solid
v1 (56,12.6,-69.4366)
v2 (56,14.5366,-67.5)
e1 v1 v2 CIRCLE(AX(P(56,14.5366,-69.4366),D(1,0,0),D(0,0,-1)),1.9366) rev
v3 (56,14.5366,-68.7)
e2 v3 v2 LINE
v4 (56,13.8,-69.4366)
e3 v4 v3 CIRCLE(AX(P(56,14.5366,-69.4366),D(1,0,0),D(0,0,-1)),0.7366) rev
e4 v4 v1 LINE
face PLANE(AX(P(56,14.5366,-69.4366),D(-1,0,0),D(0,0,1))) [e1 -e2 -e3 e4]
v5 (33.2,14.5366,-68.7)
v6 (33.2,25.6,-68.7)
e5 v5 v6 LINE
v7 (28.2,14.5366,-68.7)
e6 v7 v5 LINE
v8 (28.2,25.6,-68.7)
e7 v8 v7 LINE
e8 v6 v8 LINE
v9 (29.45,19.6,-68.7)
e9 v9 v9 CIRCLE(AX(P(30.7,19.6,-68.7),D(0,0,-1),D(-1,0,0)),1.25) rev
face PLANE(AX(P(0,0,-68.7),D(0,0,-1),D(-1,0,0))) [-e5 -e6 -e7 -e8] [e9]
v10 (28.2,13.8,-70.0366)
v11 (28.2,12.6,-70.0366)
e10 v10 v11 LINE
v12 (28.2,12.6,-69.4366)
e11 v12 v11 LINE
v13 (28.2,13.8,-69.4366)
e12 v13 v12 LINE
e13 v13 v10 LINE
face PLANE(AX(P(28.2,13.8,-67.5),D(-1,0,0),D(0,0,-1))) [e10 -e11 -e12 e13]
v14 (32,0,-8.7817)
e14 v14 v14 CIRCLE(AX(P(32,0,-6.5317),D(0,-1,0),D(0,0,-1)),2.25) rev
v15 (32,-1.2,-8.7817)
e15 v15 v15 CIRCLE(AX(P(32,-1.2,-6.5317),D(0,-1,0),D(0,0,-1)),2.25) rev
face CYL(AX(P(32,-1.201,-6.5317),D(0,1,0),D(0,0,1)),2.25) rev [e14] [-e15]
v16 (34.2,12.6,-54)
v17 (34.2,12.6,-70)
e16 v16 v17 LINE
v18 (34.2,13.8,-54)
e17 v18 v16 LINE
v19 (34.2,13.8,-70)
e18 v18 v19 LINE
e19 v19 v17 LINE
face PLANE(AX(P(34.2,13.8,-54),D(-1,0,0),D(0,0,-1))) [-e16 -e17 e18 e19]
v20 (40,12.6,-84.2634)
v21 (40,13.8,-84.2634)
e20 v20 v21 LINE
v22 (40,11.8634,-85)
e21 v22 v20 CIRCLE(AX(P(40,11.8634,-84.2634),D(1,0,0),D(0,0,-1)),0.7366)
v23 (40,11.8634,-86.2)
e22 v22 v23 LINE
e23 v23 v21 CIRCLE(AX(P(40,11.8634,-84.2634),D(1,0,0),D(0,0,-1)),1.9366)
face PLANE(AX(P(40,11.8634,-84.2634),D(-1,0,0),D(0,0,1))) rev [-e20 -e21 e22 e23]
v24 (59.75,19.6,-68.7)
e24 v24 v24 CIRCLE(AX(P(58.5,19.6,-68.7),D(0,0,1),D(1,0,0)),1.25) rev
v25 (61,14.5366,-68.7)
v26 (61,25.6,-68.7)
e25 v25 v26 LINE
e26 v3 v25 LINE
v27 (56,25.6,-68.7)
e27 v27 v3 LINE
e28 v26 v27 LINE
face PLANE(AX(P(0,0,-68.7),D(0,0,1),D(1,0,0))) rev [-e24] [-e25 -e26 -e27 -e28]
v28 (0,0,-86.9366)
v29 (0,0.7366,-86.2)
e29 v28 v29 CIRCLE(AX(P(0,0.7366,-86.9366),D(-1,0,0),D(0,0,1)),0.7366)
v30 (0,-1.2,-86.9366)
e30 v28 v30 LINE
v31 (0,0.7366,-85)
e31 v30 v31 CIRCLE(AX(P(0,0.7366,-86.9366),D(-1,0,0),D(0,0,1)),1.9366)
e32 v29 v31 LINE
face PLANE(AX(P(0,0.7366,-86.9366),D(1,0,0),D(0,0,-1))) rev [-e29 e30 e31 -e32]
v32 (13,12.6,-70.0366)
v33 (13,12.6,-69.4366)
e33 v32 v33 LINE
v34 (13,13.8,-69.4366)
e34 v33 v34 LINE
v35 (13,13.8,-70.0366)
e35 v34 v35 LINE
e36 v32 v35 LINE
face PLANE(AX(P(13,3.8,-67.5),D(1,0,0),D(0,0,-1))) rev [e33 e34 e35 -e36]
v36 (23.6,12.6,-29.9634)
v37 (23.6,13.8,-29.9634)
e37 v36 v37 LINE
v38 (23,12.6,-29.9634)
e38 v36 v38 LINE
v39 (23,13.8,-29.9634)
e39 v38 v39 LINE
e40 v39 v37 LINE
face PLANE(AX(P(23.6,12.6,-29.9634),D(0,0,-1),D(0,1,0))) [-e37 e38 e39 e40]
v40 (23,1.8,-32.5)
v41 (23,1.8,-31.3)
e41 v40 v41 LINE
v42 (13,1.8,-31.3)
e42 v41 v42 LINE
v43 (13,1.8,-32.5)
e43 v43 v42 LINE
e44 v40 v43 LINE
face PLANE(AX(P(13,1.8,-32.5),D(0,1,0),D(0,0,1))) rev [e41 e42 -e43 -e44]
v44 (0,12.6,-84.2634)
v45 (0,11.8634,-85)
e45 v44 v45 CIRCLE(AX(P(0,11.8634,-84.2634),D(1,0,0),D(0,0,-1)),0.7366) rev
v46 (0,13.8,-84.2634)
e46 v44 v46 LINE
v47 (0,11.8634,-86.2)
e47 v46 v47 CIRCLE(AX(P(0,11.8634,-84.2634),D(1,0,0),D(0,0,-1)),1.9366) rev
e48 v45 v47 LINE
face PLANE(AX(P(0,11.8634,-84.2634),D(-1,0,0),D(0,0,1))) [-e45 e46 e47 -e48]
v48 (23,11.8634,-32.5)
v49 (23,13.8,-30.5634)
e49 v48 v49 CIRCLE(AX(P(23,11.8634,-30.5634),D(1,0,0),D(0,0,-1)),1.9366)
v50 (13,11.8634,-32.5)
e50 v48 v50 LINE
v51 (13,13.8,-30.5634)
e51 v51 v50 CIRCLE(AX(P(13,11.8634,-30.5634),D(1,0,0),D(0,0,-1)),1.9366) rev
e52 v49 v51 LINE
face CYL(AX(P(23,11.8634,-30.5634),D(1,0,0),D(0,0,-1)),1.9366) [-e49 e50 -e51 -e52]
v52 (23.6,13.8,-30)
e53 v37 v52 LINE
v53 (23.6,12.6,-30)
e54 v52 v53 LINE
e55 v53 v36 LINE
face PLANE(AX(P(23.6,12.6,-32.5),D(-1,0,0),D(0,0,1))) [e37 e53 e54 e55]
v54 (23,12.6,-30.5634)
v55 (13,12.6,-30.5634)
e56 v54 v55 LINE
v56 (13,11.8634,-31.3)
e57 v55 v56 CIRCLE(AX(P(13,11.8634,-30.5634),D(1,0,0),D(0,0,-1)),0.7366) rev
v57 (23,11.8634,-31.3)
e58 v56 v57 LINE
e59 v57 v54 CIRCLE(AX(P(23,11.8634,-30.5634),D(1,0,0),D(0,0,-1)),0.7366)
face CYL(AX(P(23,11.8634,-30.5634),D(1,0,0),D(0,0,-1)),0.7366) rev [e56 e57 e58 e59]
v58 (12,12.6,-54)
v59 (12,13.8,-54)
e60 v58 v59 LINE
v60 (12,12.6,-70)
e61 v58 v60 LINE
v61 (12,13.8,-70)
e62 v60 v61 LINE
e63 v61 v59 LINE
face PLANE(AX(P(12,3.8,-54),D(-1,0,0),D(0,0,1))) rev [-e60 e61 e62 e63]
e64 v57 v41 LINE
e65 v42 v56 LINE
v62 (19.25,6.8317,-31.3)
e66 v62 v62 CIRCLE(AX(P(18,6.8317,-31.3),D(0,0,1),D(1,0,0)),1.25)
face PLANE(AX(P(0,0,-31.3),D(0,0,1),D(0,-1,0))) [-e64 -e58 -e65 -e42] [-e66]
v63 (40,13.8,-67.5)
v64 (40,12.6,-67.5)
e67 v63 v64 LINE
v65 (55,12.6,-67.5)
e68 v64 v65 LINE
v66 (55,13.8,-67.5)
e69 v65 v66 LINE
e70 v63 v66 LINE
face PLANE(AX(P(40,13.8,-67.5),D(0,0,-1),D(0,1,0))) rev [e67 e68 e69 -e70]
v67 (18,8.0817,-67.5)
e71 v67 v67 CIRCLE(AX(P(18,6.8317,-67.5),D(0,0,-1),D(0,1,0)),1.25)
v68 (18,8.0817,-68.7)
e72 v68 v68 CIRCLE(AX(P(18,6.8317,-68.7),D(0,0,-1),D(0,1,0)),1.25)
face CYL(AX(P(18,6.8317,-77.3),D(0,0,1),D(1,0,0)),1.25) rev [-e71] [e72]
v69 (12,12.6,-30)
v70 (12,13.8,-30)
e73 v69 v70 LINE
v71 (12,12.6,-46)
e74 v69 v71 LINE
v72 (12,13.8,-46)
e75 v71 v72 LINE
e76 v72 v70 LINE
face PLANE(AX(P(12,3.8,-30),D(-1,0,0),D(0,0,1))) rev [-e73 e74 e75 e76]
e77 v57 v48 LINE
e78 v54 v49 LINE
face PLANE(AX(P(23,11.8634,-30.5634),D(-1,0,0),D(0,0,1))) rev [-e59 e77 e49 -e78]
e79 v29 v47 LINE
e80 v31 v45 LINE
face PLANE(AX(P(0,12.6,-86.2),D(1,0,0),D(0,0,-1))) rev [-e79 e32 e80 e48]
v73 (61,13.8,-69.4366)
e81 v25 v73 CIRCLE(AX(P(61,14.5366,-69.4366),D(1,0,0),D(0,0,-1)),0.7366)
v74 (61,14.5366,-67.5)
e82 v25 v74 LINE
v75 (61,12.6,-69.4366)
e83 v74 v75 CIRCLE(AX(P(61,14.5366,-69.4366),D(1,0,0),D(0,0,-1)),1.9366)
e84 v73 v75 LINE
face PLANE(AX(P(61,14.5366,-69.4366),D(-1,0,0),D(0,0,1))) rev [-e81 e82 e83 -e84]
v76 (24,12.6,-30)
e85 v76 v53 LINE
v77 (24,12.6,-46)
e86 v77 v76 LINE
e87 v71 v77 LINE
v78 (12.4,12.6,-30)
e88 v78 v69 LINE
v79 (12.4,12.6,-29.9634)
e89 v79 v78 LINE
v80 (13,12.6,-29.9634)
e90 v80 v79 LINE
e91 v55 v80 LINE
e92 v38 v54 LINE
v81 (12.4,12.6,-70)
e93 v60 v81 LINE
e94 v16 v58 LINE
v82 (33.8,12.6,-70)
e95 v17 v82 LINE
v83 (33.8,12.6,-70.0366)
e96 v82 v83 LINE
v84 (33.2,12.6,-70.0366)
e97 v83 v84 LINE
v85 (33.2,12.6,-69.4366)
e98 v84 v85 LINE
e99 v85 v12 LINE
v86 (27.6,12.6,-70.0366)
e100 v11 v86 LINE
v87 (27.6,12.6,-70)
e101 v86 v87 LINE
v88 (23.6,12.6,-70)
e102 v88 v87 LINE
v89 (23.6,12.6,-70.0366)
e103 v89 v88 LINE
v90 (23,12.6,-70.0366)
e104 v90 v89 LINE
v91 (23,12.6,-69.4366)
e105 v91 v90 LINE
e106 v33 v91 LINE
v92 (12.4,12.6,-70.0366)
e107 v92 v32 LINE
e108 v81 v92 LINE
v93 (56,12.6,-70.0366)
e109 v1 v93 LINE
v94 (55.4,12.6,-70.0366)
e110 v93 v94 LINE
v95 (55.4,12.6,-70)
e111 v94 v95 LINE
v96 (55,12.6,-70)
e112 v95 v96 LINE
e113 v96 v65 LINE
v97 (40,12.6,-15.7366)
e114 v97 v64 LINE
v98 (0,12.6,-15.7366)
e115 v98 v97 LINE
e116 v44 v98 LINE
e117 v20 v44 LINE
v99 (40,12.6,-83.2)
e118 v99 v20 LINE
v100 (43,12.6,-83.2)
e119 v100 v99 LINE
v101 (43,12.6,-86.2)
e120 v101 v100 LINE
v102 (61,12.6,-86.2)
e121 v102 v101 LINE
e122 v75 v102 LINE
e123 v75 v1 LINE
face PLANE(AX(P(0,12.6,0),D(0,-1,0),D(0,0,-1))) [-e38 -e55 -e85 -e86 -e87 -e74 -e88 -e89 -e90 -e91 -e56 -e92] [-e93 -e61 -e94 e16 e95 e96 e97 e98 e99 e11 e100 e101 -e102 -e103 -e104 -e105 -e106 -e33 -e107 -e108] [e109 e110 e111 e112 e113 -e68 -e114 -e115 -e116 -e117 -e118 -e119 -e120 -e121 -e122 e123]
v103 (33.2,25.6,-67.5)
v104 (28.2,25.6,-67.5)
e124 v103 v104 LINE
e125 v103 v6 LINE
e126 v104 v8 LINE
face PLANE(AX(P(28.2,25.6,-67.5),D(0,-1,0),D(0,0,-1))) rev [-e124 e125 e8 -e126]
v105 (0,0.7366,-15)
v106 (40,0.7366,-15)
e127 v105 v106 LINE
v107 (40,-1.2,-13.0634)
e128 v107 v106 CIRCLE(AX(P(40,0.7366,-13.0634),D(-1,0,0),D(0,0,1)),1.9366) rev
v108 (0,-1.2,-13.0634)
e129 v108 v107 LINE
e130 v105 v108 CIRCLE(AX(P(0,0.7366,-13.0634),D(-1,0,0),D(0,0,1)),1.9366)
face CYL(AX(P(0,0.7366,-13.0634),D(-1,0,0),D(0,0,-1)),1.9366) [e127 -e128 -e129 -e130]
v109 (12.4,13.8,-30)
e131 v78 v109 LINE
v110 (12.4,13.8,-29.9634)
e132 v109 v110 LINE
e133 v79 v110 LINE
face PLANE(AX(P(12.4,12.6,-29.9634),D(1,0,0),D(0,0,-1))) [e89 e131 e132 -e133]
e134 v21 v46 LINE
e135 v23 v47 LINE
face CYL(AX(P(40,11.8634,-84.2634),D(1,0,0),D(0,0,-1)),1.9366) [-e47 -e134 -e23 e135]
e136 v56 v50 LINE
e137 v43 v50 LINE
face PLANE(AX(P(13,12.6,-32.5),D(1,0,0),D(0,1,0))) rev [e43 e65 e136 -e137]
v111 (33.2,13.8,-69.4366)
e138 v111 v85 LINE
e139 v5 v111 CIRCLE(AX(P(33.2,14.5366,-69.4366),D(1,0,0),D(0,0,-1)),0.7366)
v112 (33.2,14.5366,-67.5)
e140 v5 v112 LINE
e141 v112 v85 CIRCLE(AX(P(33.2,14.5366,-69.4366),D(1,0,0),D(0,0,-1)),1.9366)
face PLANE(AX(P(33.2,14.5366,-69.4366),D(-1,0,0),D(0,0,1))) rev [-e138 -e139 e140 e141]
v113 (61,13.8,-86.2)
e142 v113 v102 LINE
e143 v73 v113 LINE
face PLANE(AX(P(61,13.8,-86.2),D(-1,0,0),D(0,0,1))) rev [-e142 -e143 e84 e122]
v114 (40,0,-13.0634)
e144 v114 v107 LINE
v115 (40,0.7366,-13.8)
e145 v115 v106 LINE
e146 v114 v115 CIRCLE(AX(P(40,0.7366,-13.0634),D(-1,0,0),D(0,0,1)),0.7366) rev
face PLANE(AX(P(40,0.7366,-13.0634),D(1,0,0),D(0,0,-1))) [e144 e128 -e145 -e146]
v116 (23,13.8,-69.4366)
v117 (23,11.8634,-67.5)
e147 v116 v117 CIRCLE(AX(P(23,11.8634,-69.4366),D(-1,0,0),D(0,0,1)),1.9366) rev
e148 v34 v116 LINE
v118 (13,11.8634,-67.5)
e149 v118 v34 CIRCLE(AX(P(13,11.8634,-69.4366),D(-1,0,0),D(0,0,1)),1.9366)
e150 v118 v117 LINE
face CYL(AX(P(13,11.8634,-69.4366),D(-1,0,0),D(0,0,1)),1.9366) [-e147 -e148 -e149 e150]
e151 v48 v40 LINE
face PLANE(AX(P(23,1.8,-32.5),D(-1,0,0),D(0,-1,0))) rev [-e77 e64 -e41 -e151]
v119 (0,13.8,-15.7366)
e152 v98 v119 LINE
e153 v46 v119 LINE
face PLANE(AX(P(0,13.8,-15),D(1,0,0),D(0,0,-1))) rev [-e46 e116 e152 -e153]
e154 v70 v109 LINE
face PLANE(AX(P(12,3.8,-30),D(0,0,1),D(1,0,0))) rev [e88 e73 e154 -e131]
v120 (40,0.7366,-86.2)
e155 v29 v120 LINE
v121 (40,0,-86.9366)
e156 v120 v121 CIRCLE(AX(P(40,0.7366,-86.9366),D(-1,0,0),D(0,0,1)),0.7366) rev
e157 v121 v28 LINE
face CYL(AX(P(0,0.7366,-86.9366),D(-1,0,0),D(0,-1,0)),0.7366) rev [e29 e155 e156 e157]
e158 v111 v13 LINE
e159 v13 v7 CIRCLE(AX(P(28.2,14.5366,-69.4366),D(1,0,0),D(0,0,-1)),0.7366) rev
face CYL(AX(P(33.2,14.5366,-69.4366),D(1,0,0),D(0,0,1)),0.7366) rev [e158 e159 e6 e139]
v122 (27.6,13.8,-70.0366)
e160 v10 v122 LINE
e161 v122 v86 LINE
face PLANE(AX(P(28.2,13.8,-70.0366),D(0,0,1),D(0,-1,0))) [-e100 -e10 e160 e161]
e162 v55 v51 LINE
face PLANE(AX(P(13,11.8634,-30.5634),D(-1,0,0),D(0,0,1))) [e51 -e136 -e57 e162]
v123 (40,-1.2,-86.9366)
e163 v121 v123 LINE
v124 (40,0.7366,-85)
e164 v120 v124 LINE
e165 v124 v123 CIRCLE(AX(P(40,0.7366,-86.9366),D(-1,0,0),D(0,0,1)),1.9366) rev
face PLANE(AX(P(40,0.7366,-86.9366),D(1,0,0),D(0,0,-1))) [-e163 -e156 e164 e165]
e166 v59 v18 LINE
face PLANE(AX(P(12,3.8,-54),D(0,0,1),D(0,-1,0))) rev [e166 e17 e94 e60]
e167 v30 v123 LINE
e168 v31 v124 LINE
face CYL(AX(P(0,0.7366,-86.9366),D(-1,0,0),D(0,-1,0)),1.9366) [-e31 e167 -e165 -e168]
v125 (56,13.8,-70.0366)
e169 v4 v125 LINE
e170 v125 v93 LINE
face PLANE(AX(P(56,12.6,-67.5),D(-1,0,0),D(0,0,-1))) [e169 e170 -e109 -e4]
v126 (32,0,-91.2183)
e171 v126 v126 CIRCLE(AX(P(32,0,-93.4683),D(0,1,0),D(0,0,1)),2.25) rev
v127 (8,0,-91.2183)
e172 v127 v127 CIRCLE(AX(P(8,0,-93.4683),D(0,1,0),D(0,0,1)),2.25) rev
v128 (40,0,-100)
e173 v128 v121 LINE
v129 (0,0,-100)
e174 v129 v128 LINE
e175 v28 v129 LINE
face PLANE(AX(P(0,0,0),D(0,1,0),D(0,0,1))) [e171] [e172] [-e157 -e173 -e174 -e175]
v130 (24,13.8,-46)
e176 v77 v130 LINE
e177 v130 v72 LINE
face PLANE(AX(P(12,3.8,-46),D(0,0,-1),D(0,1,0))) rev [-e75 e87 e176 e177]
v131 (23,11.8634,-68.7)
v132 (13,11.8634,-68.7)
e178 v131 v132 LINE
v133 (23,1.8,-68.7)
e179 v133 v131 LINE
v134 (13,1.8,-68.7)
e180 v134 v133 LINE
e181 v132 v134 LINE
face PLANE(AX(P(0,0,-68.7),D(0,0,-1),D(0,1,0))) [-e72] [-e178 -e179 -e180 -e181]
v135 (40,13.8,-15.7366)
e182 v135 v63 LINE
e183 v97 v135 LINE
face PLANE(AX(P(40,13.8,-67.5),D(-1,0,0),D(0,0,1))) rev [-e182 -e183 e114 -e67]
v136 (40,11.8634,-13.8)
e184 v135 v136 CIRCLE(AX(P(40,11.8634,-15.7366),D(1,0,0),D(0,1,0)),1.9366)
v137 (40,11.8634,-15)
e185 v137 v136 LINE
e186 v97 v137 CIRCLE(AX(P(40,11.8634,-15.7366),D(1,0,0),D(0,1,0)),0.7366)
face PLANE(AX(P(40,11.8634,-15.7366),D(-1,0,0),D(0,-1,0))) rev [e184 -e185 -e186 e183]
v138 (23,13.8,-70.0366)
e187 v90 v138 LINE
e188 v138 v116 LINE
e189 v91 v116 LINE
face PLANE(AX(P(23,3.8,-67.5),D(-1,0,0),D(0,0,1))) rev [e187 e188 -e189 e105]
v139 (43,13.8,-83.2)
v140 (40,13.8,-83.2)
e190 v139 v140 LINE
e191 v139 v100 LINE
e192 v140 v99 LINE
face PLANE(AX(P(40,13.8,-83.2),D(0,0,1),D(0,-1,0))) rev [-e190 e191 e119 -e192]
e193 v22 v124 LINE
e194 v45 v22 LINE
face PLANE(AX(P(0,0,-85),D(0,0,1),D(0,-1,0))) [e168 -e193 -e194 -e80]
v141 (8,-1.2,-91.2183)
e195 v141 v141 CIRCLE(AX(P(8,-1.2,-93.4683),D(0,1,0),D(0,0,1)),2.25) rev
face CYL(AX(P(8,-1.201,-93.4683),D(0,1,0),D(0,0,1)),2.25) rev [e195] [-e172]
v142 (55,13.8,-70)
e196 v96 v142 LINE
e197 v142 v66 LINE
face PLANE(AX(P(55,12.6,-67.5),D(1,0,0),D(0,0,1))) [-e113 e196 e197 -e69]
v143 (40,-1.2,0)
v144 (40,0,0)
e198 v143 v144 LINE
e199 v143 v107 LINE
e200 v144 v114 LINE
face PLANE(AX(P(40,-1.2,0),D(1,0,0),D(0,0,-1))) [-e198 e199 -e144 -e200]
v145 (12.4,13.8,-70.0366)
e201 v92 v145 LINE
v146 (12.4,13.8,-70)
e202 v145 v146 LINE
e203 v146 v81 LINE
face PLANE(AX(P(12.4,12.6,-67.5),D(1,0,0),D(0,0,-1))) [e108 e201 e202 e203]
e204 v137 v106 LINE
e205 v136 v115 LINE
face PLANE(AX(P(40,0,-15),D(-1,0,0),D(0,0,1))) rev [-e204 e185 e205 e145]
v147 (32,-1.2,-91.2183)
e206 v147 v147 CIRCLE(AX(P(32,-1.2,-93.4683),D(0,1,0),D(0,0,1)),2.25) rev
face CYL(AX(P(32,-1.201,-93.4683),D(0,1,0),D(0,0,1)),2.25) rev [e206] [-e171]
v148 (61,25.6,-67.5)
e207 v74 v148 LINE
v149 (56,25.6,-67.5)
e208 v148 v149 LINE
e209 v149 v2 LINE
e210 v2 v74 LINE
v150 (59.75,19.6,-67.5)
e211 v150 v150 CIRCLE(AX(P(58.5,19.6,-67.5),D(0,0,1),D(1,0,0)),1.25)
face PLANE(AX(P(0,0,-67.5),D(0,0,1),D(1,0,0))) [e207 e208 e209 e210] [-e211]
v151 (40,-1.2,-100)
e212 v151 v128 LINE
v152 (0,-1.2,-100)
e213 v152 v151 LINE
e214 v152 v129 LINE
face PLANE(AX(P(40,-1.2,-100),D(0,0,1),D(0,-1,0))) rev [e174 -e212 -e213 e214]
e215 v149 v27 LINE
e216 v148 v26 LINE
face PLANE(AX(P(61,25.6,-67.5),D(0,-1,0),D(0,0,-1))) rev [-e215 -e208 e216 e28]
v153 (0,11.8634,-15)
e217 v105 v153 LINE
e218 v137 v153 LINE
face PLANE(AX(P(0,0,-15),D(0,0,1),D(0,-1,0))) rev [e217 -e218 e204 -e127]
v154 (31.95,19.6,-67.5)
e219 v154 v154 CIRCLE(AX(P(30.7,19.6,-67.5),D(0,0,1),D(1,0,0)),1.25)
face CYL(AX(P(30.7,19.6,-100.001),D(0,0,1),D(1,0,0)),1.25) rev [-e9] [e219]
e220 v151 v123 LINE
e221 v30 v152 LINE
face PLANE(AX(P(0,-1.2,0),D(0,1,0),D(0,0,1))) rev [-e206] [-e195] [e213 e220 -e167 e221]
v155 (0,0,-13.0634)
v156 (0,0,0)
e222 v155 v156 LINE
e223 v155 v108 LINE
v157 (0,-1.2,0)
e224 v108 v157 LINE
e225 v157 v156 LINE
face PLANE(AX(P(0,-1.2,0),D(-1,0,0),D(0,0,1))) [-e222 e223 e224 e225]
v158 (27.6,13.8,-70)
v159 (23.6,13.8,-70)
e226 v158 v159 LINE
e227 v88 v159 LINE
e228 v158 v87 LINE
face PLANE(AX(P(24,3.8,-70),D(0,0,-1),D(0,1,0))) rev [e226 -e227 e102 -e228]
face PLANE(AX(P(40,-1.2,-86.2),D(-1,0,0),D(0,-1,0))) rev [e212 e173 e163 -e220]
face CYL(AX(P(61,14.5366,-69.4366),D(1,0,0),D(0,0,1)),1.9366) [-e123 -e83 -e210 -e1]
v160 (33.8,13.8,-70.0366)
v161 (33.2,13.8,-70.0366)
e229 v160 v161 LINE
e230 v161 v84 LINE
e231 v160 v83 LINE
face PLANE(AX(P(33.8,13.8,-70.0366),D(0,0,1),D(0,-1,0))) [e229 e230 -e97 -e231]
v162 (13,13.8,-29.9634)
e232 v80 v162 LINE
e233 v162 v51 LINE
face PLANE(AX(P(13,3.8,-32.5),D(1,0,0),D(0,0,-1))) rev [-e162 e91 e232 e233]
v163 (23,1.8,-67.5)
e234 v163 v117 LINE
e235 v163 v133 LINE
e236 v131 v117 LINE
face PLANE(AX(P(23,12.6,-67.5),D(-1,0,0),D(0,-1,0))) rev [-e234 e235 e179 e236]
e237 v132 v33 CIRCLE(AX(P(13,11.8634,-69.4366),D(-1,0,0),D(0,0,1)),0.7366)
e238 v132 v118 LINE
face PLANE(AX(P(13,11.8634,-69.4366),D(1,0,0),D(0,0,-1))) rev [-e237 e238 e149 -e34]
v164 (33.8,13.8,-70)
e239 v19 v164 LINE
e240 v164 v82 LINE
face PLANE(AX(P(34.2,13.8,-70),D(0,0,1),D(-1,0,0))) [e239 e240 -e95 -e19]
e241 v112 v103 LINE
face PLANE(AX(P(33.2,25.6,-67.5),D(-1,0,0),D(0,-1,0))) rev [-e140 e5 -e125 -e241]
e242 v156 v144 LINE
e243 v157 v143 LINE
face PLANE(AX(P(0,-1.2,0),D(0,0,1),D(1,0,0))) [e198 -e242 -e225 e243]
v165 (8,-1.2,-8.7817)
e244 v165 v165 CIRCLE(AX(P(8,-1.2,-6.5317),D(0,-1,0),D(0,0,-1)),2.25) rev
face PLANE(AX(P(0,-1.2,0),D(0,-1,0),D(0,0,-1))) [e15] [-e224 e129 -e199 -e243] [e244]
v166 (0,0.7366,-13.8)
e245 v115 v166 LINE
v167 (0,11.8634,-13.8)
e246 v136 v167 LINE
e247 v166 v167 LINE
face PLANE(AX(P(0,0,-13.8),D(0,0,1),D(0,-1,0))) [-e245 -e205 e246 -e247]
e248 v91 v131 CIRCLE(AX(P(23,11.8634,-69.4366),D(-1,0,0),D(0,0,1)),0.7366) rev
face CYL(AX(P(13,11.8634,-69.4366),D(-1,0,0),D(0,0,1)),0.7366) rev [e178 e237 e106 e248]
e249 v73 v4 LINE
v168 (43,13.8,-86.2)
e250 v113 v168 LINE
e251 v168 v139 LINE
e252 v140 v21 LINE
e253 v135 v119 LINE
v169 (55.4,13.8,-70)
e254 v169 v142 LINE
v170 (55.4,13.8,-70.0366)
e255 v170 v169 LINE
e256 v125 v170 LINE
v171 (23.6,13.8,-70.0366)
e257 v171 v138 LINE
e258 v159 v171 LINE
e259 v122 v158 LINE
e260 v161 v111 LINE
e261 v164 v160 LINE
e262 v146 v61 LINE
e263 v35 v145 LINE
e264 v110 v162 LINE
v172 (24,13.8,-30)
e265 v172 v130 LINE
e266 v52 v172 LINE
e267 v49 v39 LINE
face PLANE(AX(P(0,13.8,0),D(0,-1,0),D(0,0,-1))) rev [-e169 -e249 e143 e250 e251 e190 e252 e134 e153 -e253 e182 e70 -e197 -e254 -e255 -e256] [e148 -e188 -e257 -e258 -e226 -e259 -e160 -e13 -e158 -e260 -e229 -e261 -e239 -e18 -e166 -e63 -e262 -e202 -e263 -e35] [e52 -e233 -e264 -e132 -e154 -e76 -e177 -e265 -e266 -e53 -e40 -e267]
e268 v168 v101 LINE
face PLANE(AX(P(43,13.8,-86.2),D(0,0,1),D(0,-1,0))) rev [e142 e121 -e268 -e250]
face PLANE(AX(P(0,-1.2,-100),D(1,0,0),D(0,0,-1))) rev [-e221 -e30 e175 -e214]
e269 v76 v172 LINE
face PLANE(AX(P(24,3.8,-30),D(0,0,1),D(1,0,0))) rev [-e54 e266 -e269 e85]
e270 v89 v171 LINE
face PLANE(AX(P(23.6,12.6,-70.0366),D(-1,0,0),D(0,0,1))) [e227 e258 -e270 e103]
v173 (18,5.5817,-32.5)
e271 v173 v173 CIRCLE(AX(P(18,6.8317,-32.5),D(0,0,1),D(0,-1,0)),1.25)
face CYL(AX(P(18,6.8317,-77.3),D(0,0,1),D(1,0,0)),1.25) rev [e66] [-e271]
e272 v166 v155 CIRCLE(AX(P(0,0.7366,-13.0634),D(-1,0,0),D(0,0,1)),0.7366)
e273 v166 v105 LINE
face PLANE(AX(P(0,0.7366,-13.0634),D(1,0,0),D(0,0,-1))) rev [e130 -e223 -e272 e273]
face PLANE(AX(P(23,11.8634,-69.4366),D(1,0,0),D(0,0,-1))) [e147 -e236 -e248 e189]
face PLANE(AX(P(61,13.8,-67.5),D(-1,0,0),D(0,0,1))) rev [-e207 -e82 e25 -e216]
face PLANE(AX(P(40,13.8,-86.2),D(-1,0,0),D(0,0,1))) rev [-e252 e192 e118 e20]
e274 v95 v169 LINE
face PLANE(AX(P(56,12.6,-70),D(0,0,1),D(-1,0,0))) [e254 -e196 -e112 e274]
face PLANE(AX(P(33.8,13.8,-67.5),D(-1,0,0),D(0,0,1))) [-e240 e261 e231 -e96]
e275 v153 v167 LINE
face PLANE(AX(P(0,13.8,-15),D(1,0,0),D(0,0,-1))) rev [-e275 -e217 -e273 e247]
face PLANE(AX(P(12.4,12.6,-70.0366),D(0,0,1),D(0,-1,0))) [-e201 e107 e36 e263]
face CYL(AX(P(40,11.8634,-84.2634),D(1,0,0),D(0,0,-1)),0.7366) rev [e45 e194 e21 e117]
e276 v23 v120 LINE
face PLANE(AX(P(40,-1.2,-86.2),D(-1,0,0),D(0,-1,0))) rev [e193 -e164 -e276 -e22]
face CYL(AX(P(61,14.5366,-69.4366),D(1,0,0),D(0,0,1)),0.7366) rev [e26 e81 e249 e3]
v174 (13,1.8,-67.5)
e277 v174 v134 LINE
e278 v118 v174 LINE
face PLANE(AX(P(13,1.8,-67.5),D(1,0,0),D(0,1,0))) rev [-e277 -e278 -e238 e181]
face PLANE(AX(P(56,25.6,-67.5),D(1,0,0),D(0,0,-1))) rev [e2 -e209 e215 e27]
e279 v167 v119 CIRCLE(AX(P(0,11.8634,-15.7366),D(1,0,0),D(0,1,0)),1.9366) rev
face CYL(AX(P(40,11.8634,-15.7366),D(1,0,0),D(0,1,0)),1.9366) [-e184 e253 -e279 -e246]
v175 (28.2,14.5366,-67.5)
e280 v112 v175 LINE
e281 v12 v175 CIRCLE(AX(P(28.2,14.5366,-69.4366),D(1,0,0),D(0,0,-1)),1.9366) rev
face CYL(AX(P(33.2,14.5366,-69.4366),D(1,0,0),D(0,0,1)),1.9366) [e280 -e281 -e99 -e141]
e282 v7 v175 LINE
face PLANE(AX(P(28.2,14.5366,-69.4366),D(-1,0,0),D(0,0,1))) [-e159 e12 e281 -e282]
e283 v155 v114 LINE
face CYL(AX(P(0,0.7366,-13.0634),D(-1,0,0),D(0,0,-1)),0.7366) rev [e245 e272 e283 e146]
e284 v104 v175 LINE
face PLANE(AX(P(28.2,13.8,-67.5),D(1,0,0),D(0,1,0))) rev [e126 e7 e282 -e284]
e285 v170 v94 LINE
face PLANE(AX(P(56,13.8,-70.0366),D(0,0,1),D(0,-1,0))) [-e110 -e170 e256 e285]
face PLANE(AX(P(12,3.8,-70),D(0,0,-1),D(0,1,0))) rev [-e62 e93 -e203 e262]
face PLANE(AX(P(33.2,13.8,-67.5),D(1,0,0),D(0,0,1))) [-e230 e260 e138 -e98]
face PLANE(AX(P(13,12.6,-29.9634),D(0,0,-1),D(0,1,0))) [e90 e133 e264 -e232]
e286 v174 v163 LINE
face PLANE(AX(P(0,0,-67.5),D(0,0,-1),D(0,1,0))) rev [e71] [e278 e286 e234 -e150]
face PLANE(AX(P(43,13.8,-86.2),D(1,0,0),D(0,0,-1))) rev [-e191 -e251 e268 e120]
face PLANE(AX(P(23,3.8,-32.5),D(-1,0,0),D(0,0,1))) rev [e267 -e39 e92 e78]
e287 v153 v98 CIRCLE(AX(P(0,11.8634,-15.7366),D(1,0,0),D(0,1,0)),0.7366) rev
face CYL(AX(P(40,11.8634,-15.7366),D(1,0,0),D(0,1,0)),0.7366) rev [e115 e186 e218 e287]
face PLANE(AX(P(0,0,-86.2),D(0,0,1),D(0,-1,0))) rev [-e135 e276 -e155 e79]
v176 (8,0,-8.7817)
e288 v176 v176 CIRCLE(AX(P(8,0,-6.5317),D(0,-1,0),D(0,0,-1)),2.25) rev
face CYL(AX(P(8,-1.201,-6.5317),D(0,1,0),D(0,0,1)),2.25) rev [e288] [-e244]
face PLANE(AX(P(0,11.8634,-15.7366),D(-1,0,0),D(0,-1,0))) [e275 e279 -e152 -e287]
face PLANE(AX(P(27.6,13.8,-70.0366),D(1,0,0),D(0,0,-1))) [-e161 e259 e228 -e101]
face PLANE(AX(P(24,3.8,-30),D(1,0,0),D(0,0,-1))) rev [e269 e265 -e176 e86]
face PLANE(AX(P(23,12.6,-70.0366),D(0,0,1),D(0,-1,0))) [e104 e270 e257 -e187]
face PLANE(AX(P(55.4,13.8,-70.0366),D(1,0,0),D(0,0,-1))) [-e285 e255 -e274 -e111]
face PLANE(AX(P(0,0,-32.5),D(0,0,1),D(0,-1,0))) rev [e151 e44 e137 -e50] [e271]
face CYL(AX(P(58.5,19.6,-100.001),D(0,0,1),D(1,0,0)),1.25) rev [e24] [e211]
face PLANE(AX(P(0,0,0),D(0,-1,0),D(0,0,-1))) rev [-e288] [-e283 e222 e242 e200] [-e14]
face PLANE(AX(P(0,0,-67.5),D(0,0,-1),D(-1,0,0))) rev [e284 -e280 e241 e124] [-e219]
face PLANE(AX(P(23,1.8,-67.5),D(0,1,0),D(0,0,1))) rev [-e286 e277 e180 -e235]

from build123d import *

# Parameters (mm, degrees)
SKETCH_1_W                       = 40
SKETCH_1_H                       = 15
SM_BASE_FLANGE_1_DEPTH           = 1.2
SM_EDGE_FLANGE_1_STRIP_W         = 6.2732
SM_EDGE_FLANGE_1_STRIP_H         = 1.2
SM_EDGE_FLANGE_1_STRIP_CUT_DEPTH = 40
SM_EDGE_FLANGE_1_DEPTH           = 40
SM_EDGE_FLANGE_2_STRIP_W         = 6.2732
SM_EDGE_FLANGE_2_STRIP_H         = 1.2
SM_EDGE_FLANGE_2_STRIP_CUT_DEPTH = 40
SM_EDGE_FLANGE_2_DEPTH           = 40
SM_EDGE_FLANGE_2_FLAT_DEPTH      = 1.2
SM_EDGE_FLANGE_3_STRIP_W         = 6.2732
SM_EDGE_FLANGE_3_STRIP_H         = 1.2
SM_EDGE_FLANGE_3_STRIP_CUT_DEPTH = 40
SM_EDGE_FLANGE_3_DEPTH           = 40
SM_EDGE_FLANGE_4_STRIP_W         = 6.2732
SM_EDGE_FLANGE_4_STRIP_H         = 1.2
SM_EDGE_FLANGE_4_STRIP_CUT_DEPTH = 40
SM_EDGE_FLANGE_4_DEPTH           = 40
CUT_EXTRUDE_1_DEPTH              = 10
SM_START                         = 13
SM_EDGE_FLANGE_5_DEPTH           = 10
SM_START_2                       = 12.4
SM_EDGE_FLANGE_5_2_OUTLINE_W     = 1.2
SM_EDGE_FLANGE_5_2_OUTLINE_H     = 0.0366
SM_EDGE_FLANGE_5_2_DEPTH         = 0.6
SM_START_3                       = 23
SM_EDGE_FLANGE_5_3_OUTLINE_W     = 1.2
SM_EDGE_FLANGE_5_3_OUTLINE_H     = 0.0366
SM_EDGE_FLANGE_5_3_DEPTH         = 0.6
SM_EDGE_FLANGE_5_4_DEPTH         = 10
SKETCH_26_R                      = 1.25
CUT_EXTRUDE_2_DEPTH              = 46
CUT_EXTRUDE_3_REACH              = 120.093
SKETCH_28_W                      = 1
SKETCH_28_H                      = 2.5
SM_START_4                       = 28.2
SM_EDGE_FLANGE_6_DEPTH           = 5
SM_START_5                       = 56
SM_EDGE_FLANGE_6_2_DEPTH         = 5
SM_START_6                       = 27.6
SM_EDGE_FLANGE_6_3_OUTLINE_W     = 1.2
SM_EDGE_FLANGE_6_3_OUTLINE_H     = 0.0366
SM_EDGE_FLANGE_6_3_DEPTH         = 0.6
SM_START_7                       = 33.2
SM_EDGE_FLANGE_6_4_OUTLINE_W     = 1.2
SM_EDGE_FLANGE_6_4_OUTLINE_H     = 0.0366
SM_EDGE_FLANGE_6_4_DEPTH         = 0.6
SM_START_8                       = 55.4
SM_EDGE_FLANGE_6_5_OUTLINE_W     = 1.2
SM_EDGE_FLANGE_6_5_OUTLINE_H     = 0.0366
SM_EDGE_FLANGE_6_5_DEPTH         = 0.6
SM_EDGE_FLANGE_6_6_DEPTH         = 5
SM_EDGE_FLANGE_6_7_DEPTH         = 5
CUT_EXTRUDE_4_REACH              = 96.512
SKETCH_35_R                      = 1.25
CUT_EXTRUDE_5_REACH              = 120.093
SKETCH_36_R                      = 2.25


# Read off the part's stored shape, not the designer's step: Ребро-кромка5, Ребро-кромка6
# Sheet-metal steps are written as plain solids
with BuildPart() as part:
    # Sketch 1 → Базовая кромка1 (new body)
    with BuildSketch(Plane(origin=(0, 0, 0), x_dir=(1, 0, 0), z_dir=(0, 1, 0))):
        with Locations((20, 7.5)):
            Rectangle(SKETCH_1_W, SKETCH_1_H)
    extrude(amount=-SM_BASE_FLANGE_1_DEPTH)

    # Ребро-кромка1 strip (across the edge) → Ребро-кромка1 strip cut (cut)
    with BuildSketch(Plane(origin=(40, 0, -15), x_dir=(0, 0, 1), z_dir=(-1, 0, 0))):
        with Locations((-1.2, -0.6)):
            Rectangle(SM_EDGE_FLANGE_1_STRIP_W, SM_EDGE_FLANGE_1_STRIP_H)
    extrude(amount=SM_EDGE_FLANGE_1_STRIP_CUT_DEPTH, mode=Mode.SUBTRACT)

    # Ребро-кромка1 section (across the edge) → Ребро-кромка1 (add)
    with BuildSketch(Plane(origin=(40, 0, -15), x_dir=(0, 0, 1), z_dir=(-1, 0, 0))):
        with BuildLine():
            Line((0, 0.7366), (0, 13.8))
            Line((0, 13.8), (1.2, 13.8))
            Line((1.2, 13.8), (1.2, 0.7366))
            ThreePointArc((1.2, 0.7366), (1.415745145, 0.215745145), (1.9366, 0))
            Line((1.9366, 0), (1.9366, -1.2))
            ThreePointArc((1.9366, -1.2), (0.567217008, -0.632782992), (0, 0.7366))
        make_face()
    extrude(amount=SM_EDGE_FLANGE_1_DEPTH)

    # Ребро-кромка2 strip (across the edge) → Ребро-кромка2 strip cut (cut)
    with BuildSketch(Plane(origin=(0, 13.8, -15), x_dir=(0, -1, 0), z_dir=(1, 0, 0))):
        with Locations((-1.2, -0.6)):
            Rectangle(SM_EDGE_FLANGE_2_STRIP_W, SM_EDGE_FLANGE_2_STRIP_H)
    extrude(amount=SM_EDGE_FLANGE_2_STRIP_CUT_DEPTH, mode=Mode.SUBTRACT)

    # Ребро-кромка2 bend section (across the edge) → Ребро-кромка2 (add)
    with BuildSketch(Plane(origin=(0, 13.8, -15), x_dir=(0, -1, 0), z_dir=(1, 0, 0))):
        with BuildLine():
            Line((0, 0.7366), (1.2, 0.7366))
            ThreePointArc((1.2, 0.7366), (1.415745145, 0.215745145), (1.9366, 0))
            Line((1.9366, 0), (1.9366, -1.2))
            ThreePointArc((1.9366, -1.2), (0.567217008, -0.632782992), (0, 0.7366))
        make_face()
    extrude(amount=SM_EDGE_FLANGE_2_DEPTH)

    # Ребро-кромка2 profile (on flange) → Ребро-кромка2 flat (add)
    with BuildSketch(Plane(origin=(0, 13.8, -15), x_dir=(1, 0, 0), z_dir=(0, 1, 0))):
        Polygon((43, 71.2), (43, 68.2), (40, 68.2), (40, 71.2), (0, 71.2), (0, 0.7366), (40, 0.7366), (40, 52.5), (61, 52.5), (61, 71.2), align=None)
    extrude(amount=-SM_EDGE_FLANGE_2_FLAT_DEPTH)

    # Ребро-кромка3 strip (across the edge) → Ребро-кромка3 strip cut (cut)
    with BuildSketch(Plane(origin=(0, 12.6, -86.2), x_dir=(0, 0, 1), z_dir=(1, 0, 0))):
        with Locations((-1.2, -0.6)):
            Rectangle(SM_EDGE_FLANGE_3_STRIP_W, SM_EDGE_FLANGE_3_STRIP_H)
    extrude(amount=SM_EDGE_FLANGE_3_STRIP_CUT_DEPTH, mode=Mode.SUBTRACT)

    # Ребро-кромка3 section (across the edge) → Ребро-кромка3 (add)
    with BuildSketch(Plane(origin=(0, 12.6, -86.2), x_dir=(0, 0, 1), z_dir=(1, 0, 0))):
        with BuildLine():
            Line((0, 0.7366), (0, 13.8))
            Line((0, 13.8), (1.2, 13.8))
            Line((1.2, 13.8), (1.2, 0.7366))
            ThreePointArc((1.2, 0.7366), (1.415745145, 0.215745145), (1.9366, 0))
            Line((1.9366, 0), (1.9366, -1.2))
            ThreePointArc((1.9366, -1.2), (0.567217008, -0.632782992), (0, 0.7366))
        make_face()
    extrude(amount=SM_EDGE_FLANGE_3_DEPTH)

    # Ребро-кромка4 strip (across the edge) → Ребро-кромка4 strip cut (cut)
    with BuildSketch(Plane(origin=(40, -1.2, -86.2), x_dir=(0, 1, 0), z_dir=(-1, 0, 0))):
        with Locations((-1.2, -0.6)):
            Rectangle(SM_EDGE_FLANGE_4_STRIP_W, SM_EDGE_FLANGE_4_STRIP_H)
    extrude(amount=SM_EDGE_FLANGE_4_STRIP_CUT_DEPTH, mode=Mode.SUBTRACT)

    # Ребро-кромка4 section (across the edge) → Ребро-кромка4 (add)
    with BuildSketch(Plane(origin=(40, -1.2, -86.2), x_dir=(0, 1, 0), z_dir=(-1, 0, 0))):
        with BuildLine():
            Line((0, 0.7366), (0, 13.8))
            Line((0, 13.8), (1.2, 13.8))
            Line((1.2, 13.8), (1.2, 0.7366))
            ThreePointArc((1.2, 0.7366), (1.415745145, 0.215745145), (1.9366, 0))
            Line((1.9366, 0), (1.9366, -1.2))
            ThreePointArc((1.9366, -1.2), (0.567217008, -0.632782992), (0, 0.7366))
        make_face()
    extrude(amount=SM_EDGE_FLANGE_4_DEPTH)

    # Эскиз19 → Вырез-Вытянуть1 (cut)
    with BuildSketch(Plane(origin=(0, 13.8, 0), x_dir=(1, 0, 0), z_dir=(0, 1, 0))):
        Polygon((13, 32.5), (23, 32.5), (23, 30), (24, 30), (24, 46), (12, 46), (12, 30), (13, 30), align=None)
        Polygon((12, 54), (24, 54), (24, 70), (23, 70), (23, 67.5), (13, 67.5), (13, 70), (12, 70), align=None)
    extrude(amount=-CUT_EXTRUDE_1_DEPTH, mode=Mode.SUBTRACT)

    # Ребро-кромка5 outline → Ребро-кромка5 (cut)
    with BuildSketch(Plane.YZ.offset(SM_START)):
        with BuildLine():
            Line((12.6, -67.5), (12.6, -67.645555612))
            ThreePointArc((12.6, -67.645555612), (13.472269031, -68.358657516), (13.8, -69.4366))
            Line((13.8, -69.4366), (13.8, -67.5))
            Line((13.8, -67.5), (12.6, -67.5))
        make_face()
        with BuildLine():
            Line((12.6, -32.354444388), (12.6, -32.5))
            Line((12.6, -32.5), (13.8, -32.5))
            Line((13.8, -32.5), (13.8, -30.5634))
            ThreePointArc((13.8, -30.5634), (13.472269031, -31.641342484), (12.6, -32.354444388))
        make_face()
    extrude(amount=SM_EDGE_FLANGE_5_DEPTH, mode=Mode.SUBTRACT)

    # Sm Edge Flange 5 2 outline → Sm Edge Flange 5 2 (cut)
    with BuildSketch(Plane.YZ.offset(SM_START_2)):
        with Locations((13.2, -70.0183)):
            Rectangle(SM_EDGE_FLANGE_5_2_OUTLINE_W, SM_EDGE_FLANGE_5_2_OUTLINE_H)
        with Locations((13.2, -29.9817)):
            Rectangle(SM_EDGE_FLANGE_5_2_OUTLINE_W, SM_EDGE_FLANGE_5_2_OUTLINE_H)
    extrude(amount=SM_EDGE_FLANGE_5_2_DEPTH, mode=Mode.SUBTRACT)

    # Sm Edge Flange 5 3 outline → Sm Edge Flange 5 3 (cut)
    with BuildSketch(Plane.YZ.offset(SM_START_3)):
        with Locations((13.2, -70.0183)):
            Rectangle(SM_EDGE_FLANGE_5_3_OUTLINE_W, SM_EDGE_FLANGE_5_3_OUTLINE_H)
        with Locations((13.2, -29.9817)):
            Rectangle(SM_EDGE_FLANGE_5_3_OUTLINE_W, SM_EDGE_FLANGE_5_3_OUTLINE_H)
    extrude(amount=SM_EDGE_FLANGE_5_3_DEPTH, mode=Mode.SUBTRACT)

    # Sm Edge Flange 5 4 outline → Sm Edge Flange 5 4 (add)
    with BuildSketch(Plane.YZ.offset(SM_START)):
        with BuildLine():
            Line((11.8634, -67.5), (1.8, -67.5))
            Line((1.8, -67.5), (1.8, -68.7))
            Line((1.8, -68.7), (11.8634, -68.7))
            ThreePointArc((11.8634, -68.7), (12.384254855, -68.915745145), (12.6, -69.4366))
            Line((12.6, -69.4366), (12.6, -67.645555612))
            ThreePointArc((12.6, -67.645555612), (12.238821762, -67.536737358), (11.8634, -67.5))
        make_face()
        with BuildLine():
            ThreePointArc((11.8634, -32.5), (12.238821762, -32.463262642), (12.6, -32.354444388))
            Line((12.6, -32.354444388), (12.6, -30.5634))
            ThreePointArc((12.6, -30.5634), (12.384254855, -31.084254855), (11.8634, -31.3))
            Line((11.8634, -31.3), (1.8, -31.3))
            Line((1.8, -31.3), (1.8, -32.5))
            Line((1.8, -32.5), (11.8634, -32.5))
        make_face()
    extrude(amount=SM_EDGE_FLANGE_5_4_DEPTH)

    # Эскиз26 → Вырез-Вытянуть2 (cut)
    with BuildSketch(Plane.XY.offset(-31.3)):
        with Locations((18, 6.8317)):
            Circle(SKETCH_26_R)
    extrude(amount=-CUT_EXTRUDE_2_DEPTH, mode=Mode.SUBTRACT)

    # Эскиз28 → Вырез-Вытянуть3 (cut, up to next)
    with BuildSketch(Plane(origin=(0, 13.8, 0), x_dir=(1, 0, 0), z_dir=(0, 1, 0)), mode=Mode.PRIVATE) as cut_extrude_3_sk1:
        with Locations((55.5, 68.75)):
            Rectangle(SKETCH_28_W, SKETCH_28_H)
    cut_extrude_3_tool1 = extrude(cut_extrude_3_sk1.sketch, amount=-CUT_EXTRUDE_3_REACH, mode=Mode.PRIVATE) & part.part
    # Эскиз28 → Вырез-Вытянуть3 (cut, up to next)
    with BuildSketch(Plane(origin=(0, 13.8, 0), x_dir=(1, 0, 0), z_dir=(0, 1, 0)), mode=Mode.PRIVATE) as cut_extrude_3_sk2:
        Polygon((28.2, 67.5), (33.2, 67.5), (33.2, 70), (34.2, 70), (34.2, 54), (23, 54), (23, 70), (28.2, 70), align=None)
    cut_extrude_3_tool2 = extrude(cut_extrude_3_sk2.sketch, amount=-CUT_EXTRUDE_3_REACH, mode=Mode.PRIVATE) & part.part
    add(cut_extrude_3_tool1.solids().sort_by_distance((55.5, 13.8, -68.75))[0], mode=Mode.SUBTRACT)
    add(cut_extrude_3_tool2.solids().sort_by_distance((28.442531, 13.8, -61.493851))[0], mode=Mode.SUBTRACT)

    # Ребро-кромка6 outline → Ребро-кромка6 (cut)
    with BuildSketch(Plane.YZ.offset(SM_START_4)):
        with BuildLine():
            ThreePointArc((12.6, -69.4366), (12.927730969, -68.358657516), (13.8, -67.645555612))
            Line((13.8, -67.645555612), (13.8, -67.5))
            Line((13.8, -67.5), (12.6, -67.5))
            Line((12.6, -67.5), (12.6, -69.4366))
        make_face()
    extrude(amount=SM_EDGE_FLANGE_6_DEPTH, mode=Mode.SUBTRACT)

    # Sm Edge Flange 6 2 outline → Sm Edge Flange 6 2 (cut)
    with BuildSketch(Plane.YZ.offset(SM_START_5)):
        with BuildLine():
            ThreePointArc((12.6, -69.4366), (12.927730969, -68.358657516), (13.8, -67.645555612))
            Line((13.8, -67.645555612), (13.8, -67.5))
            Line((13.8, -67.5), (12.6, -67.5))
            Line((12.6, -67.5), (12.6, -69.4366))
        make_face()
    extrude(amount=SM_EDGE_FLANGE_6_2_DEPTH, mode=Mode.SUBTRACT)

    # Sm Edge Flange 6 3 outline → Sm Edge Flange 6 3 (cut)
    with BuildSketch(Plane.YZ.offset(SM_START_6)):
        with Locations((13.2, -70.0183)):
            Rectangle(SM_EDGE_FLANGE_6_3_OUTLINE_W, SM_EDGE_FLANGE_6_3_OUTLINE_H)
    extrude(amount=SM_EDGE_FLANGE_6_3_DEPTH, mode=Mode.SUBTRACT)

    # Sm Edge Flange 6 4 outline → Sm Edge Flange 6 4 (cut)
    with BuildSketch(Plane.YZ.offset(SM_START_7)):
        with Locations((13.2, -70.0183)):
            Rectangle(SM_EDGE_FLANGE_6_4_OUTLINE_W, SM_EDGE_FLANGE_6_4_OUTLINE_H)
    extrude(amount=SM_EDGE_FLANGE_6_4_DEPTH, mode=Mode.SUBTRACT)

    # Sm Edge Flange 6 5 outline → Sm Edge Flange 6 5 (cut)
    with BuildSketch(Plane.YZ.offset(SM_START_8)):
        with Locations((13.2, -70.0183)):
            Rectangle(SM_EDGE_FLANGE_6_5_OUTLINE_W, SM_EDGE_FLANGE_6_5_OUTLINE_H)
    extrude(amount=SM_EDGE_FLANGE_6_5_DEPTH, mode=Mode.SUBTRACT)

    # Sm Edge Flange 6 6 outline → Sm Edge Flange 6 6 (add)
    with BuildSketch(Plane.YZ.offset(SM_START_4)):
        with BuildLine():
            Line((25.6, -67.5), (14.5366, -67.5))
            ThreePointArc((14.5366, -67.5), (14.161178238, -67.536737358), (13.8, -67.645555612))
            Line((13.8, -67.645555612), (13.8, -69.4366))
            ThreePointArc((13.8, -69.4366), (14.015745145, -68.915745145), (14.5366, -68.7))
            Line((14.5366, -68.7), (25.6, -68.7))
            Line((25.6, -68.7), (25.6, -67.5))
        make_face()
    extrude(amount=SM_EDGE_FLANGE_6_6_DEPTH)

    # Sm Edge Flange 6 7 outline → Sm Edge Flange 6 7 (add)
    with BuildSketch(Plane.YZ.offset(SM_START_5)):
        with BuildLine():
            Line((25.6, -67.5), (14.5366, -67.5))
            ThreePointArc((14.5366, -67.5), (14.161178238, -67.536737358), (13.8, -67.645555612))
            Line((13.8, -67.645555612), (13.8, -69.4366))
            ThreePointArc((13.8, -69.4366), (14.015745145, -68.915745145), (14.5366, -68.7))
            Line((14.5366, -68.7), (25.6, -68.7))
            Line((25.6, -68.7), (25.6, -67.5))
        make_face()
    extrude(amount=SM_EDGE_FLANGE_6_7_DEPTH)

    # Эскиз35 → Вырез-Вытянуть4 (cut, up to next)
    with BuildSketch(Plane.XY.offset(-67.5), mode=Mode.PRIVATE) as cut_extrude_4_sk1:
        with Locations((30.7, 19.6)):
            Circle(SKETCH_35_R)
    cut_extrude_4_tool1 = extrude(cut_extrude_4_sk1.sketch, amount=-CUT_EXTRUDE_4_REACH, mode=Mode.PRIVATE) & part.part
    # Эскиз35 → Вырез-Вытянуть4 (cut, up to next)
    with BuildSketch(Plane.XY.offset(-67.5), mode=Mode.PRIVATE) as cut_extrude_4_sk2:
        with Locations((58.5, 19.6)):
            Circle(SKETCH_35_R)
    cut_extrude_4_tool2 = extrude(cut_extrude_4_sk2.sketch, amount=-CUT_EXTRUDE_4_REACH, mode=Mode.PRIVATE) & part.part
    add(cut_extrude_4_tool1.solids().sort_by_distance((30.7, 19.6, -67.5))[0], mode=Mode.SUBTRACT)
    add(cut_extrude_4_tool2.solids().sort_by_distance((58.5, 19.6, -67.5))[0], mode=Mode.SUBTRACT)

    # Эскиз36 → Вырез-Вытянуть5 (cut, up to next)
    with BuildSketch(Plane(origin=(0, 13.8, 0), x_dir=(1, 0, 0), z_dir=(0, 1, 0)), mode=Mode.PRIVATE) as cut_extrude_5_sk1:
        with Locations(Location((8, 93.4683, 0), (0, 0, 270))):
            Circle(SKETCH_36_R)
    cut_extrude_5_tool1 = extrude(cut_extrude_5_sk1.sketch, amount=-CUT_EXTRUDE_5_REACH, mode=Mode.PRIVATE) & part.part
    # Эскиз36 → Вырез-Вытянуть5 (cut, up to next)
    with BuildSketch(Plane(origin=(0, 13.8, 0), x_dir=(1, 0, 0), z_dir=(0, 1, 0)), mode=Mode.PRIVATE) as cut_extrude_5_sk2:
        with Locations(Location((32, 93.4683, 0), (0, 0, 270))):
            Circle(SKETCH_36_R)
    cut_extrude_5_tool2 = extrude(cut_extrude_5_sk2.sketch, amount=-CUT_EXTRUDE_5_REACH, mode=Mode.PRIVATE) & part.part
    # Эскиз36 → Вырез-Вытянуть5 (cut, up to next)
    with BuildSketch(Plane(origin=(0, 13.8, 0), x_dir=(1, 0, 0), z_dir=(0, 1, 0)), mode=Mode.PRIVATE) as cut_extrude_5_sk3:
        with Locations(Location((8, 6.5317, 0), (0, 0, 90))):
            Circle(SKETCH_36_R)
    cut_extrude_5_tool3 = extrude(cut_extrude_5_sk3.sketch, amount=-CUT_EXTRUDE_5_REACH, mode=Mode.PRIVATE) & part.part
    # Эскиз36 → Вырез-Вытянуть5 (cut, up to next)
    with BuildSketch(Plane(origin=(0, 13.8, 0), x_dir=(1, 0, 0), z_dir=(0, 1, 0)), mode=Mode.PRIVATE) as cut_extrude_5_sk4:
        with Locations(Location((32, 6.5317, 0), (0, 0, 90))):
            Circle(SKETCH_36_R)
    cut_extrude_5_tool4 = extrude(cut_extrude_5_sk4.sketch, amount=-CUT_EXTRUDE_5_REACH, mode=Mode.PRIVATE) & part.part
    add(cut_extrude_5_tool1.solids().sort_by_distance((8, 13.8, -93.4683))[0], mode=Mode.SUBTRACT)
    add(cut_extrude_5_tool2.solids().sort_by_distance((32, 13.8, -93.4683))[0], mode=Mode.SUBTRACT)
    add(cut_extrude_5_tool3.solids().sort_by_distance((8, 13.8, -6.5317))[0], mode=Mode.SUBTRACT)
    add(cut_extrude_5_tool4.solids().sort_by_distance((32, 13.8, -6.5317))[0], mode=Mode.SUBTRACT)


solid = part.part
